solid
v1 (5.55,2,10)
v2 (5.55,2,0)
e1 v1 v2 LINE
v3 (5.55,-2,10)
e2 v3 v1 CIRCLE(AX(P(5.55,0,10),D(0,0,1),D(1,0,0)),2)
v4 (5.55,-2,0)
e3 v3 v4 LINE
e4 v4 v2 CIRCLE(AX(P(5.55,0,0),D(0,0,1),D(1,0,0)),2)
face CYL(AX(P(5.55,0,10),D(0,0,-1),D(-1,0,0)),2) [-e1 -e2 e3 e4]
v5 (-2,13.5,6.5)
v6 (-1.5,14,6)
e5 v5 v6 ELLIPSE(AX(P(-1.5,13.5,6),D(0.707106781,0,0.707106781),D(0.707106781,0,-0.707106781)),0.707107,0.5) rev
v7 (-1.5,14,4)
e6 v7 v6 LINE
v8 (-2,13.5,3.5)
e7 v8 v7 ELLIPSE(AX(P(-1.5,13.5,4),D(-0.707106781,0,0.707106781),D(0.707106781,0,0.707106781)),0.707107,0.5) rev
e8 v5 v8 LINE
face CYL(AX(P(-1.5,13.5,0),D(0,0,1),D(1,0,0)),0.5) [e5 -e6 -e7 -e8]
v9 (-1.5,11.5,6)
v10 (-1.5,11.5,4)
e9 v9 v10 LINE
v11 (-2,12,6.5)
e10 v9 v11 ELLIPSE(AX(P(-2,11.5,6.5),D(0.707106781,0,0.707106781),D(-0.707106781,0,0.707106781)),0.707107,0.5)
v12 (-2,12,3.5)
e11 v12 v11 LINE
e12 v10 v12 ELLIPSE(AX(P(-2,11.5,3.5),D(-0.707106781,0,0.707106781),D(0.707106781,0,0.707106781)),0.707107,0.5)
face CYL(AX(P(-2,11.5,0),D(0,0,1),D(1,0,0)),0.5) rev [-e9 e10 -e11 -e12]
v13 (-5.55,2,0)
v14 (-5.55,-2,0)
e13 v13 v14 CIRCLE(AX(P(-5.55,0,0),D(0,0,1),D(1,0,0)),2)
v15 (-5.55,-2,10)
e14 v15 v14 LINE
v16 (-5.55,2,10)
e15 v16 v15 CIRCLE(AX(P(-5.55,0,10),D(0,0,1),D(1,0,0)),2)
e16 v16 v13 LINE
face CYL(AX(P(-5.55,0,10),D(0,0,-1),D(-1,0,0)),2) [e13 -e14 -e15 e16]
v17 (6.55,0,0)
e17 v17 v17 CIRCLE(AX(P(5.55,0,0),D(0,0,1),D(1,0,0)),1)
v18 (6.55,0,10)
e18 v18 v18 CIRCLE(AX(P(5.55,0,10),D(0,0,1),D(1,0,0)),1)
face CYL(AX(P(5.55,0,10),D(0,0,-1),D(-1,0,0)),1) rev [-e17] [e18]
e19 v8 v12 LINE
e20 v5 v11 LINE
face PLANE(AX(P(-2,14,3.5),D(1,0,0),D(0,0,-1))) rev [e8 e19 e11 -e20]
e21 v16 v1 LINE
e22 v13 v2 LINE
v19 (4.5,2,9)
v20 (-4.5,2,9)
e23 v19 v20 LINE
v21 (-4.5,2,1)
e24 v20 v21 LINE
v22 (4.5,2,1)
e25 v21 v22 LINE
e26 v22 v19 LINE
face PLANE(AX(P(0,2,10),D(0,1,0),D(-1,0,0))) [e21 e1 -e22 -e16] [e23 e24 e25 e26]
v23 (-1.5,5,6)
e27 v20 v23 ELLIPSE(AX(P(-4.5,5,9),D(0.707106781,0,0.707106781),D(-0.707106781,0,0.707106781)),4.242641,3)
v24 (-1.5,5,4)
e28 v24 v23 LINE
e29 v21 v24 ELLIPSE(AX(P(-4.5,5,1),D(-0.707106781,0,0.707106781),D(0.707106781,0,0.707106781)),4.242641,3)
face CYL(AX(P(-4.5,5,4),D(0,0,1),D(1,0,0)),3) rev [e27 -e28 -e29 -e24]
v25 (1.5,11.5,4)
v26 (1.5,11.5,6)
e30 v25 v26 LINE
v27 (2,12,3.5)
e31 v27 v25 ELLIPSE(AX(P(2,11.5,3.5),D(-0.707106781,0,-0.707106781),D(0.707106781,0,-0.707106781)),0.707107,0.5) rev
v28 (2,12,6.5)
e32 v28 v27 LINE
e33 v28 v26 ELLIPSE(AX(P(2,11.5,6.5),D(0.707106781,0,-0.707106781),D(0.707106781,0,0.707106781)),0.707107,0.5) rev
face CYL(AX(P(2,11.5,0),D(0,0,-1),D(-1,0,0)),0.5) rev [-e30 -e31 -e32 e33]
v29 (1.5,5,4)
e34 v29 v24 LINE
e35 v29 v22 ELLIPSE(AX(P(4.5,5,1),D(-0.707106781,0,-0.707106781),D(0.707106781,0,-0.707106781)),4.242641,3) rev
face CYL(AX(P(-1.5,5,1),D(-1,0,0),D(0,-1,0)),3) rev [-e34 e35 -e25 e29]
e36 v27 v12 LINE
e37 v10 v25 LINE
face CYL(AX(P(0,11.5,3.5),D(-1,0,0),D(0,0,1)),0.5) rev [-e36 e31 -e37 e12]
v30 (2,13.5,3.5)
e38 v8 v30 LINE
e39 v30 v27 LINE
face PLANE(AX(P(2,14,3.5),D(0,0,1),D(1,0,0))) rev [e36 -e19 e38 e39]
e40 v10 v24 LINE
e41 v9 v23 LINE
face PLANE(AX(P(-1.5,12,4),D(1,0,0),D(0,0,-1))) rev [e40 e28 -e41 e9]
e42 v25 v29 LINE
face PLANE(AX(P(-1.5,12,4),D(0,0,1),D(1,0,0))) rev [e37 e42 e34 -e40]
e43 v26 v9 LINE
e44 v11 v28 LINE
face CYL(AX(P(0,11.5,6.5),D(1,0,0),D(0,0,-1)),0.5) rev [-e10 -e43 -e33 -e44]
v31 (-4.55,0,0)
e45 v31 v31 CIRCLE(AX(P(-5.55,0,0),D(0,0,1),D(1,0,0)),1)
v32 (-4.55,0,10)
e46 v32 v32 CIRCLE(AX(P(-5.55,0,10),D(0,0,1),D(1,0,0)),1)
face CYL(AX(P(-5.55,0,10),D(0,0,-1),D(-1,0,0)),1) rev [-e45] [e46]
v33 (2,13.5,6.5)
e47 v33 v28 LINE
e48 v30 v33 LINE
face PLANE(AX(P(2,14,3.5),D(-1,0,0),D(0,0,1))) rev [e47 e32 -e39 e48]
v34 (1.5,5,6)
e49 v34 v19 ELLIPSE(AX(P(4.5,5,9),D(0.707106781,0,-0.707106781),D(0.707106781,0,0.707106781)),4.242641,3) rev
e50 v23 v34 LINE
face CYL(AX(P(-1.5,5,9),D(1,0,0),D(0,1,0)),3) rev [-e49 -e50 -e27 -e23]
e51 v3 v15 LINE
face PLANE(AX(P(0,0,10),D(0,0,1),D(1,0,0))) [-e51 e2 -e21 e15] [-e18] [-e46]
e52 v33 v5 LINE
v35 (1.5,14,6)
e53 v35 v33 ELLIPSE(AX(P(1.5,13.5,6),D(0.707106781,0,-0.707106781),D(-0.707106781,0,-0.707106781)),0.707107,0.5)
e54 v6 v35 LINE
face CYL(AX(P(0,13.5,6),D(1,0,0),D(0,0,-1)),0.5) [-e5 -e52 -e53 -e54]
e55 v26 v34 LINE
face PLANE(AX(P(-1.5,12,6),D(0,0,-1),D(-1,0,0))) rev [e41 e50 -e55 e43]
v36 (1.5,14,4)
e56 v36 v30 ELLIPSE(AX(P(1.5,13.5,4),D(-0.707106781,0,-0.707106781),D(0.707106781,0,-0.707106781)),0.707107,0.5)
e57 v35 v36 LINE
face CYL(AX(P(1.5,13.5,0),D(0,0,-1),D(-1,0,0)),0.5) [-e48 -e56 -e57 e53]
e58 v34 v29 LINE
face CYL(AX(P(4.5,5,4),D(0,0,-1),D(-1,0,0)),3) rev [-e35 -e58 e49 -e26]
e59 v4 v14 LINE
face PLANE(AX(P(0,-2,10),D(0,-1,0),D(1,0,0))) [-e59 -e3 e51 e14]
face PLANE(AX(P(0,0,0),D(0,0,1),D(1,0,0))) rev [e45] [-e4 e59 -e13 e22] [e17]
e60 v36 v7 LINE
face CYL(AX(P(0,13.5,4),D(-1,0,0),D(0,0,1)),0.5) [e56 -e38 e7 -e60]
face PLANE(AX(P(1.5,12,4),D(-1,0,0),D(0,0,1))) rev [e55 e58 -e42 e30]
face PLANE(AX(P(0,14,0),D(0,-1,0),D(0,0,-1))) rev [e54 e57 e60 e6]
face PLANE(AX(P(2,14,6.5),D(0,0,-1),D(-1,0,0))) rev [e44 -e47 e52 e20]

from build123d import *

# Parameters (mm, degrees)
SKETCH1_R           = 1
BOSS_EXTRUDE1_DEPTH = 10
SKETCH2_W           = 3
SKETCH2_H           = 2
BOSS_EXTRUDE2_DEPTH = 10
FILLET1_R           = 3
SKETCH3_W           = 4
SKETCH3_H           = 3
BOSS_EXTRUDE3_DEPTH = 2
FILLET2_R           = 0.5


with BuildPart() as part:
    # Sketch1 → Boss-Extrude1 (new body)
    with BuildSketch(Plane.XY):
        with BuildLine():
            Line((5.55, -2), (-5.55, -2))
            ThreePointArc((-5.55, -2), (-7.55, 0), (-5.55, 2))
            Line((-5.55, 2), (5.55, 2))
            ThreePointArc((5.55, 2), (7.55, 0), (5.55, -2))
        make_face()
        with Locations((-5.55, 0)):
            Circle(SKETCH1_R, mode=Mode.SUBTRACT)
        with Locations((5.55, 0)):
            Circle(SKETCH1_R, mode=Mode.SUBTRACT)
    extrude(amount=BOSS_EXTRUDE1_DEPTH)

    # Sketch2 → Boss-Extrude2 (add)
    with BuildSketch(Plane(origin=(0, 2, 0), x_dir=(1, 0, 0), z_dir=(0, 1, 0))):
        with Locations((0, -5)):
            Rectangle(SKETCH2_W, SKETCH2_H)
    extrude(amount=BOSS_EXTRUDE2_DEPTH)

    # Fillet1
    fillet1_edges = [part.edges().sort_by_distance(p)[0] for p in [
        (1.5, 2, 5),
        (0, 2, 4),
        (-1.5, 2, 5),
        (0, 2, 6),
    ]]
    fillet(fillet1_edges, radius=FILLET1_R)

    # Sketch3 → Boss-Extrude3 (add)
    with BuildSketch(Plane(origin=(0, 12, 0), x_dir=(1, 0, 0), z_dir=(0, 1, 0))):
        with Locations((0, -5)):
            Rectangle(SKETCH3_W, SKETCH3_H)
    extrude(amount=BOSS_EXTRUDE3_DEPTH)

    # Fillet2
    fillet2_edges = [part.edges().sort_by_distance(p)[0] for p in [
        (1.5, 12, 5),
        (0, 12, 4),
        (-1.5, 12, 5),
        (0, 12, 6),
        (-2, 14, 5),
        (0, 14, 6.5),
        (2, 14, 5),
        (0, 14, 3.5),
    ]]
    fillet(fillet2_edges, radius=FILLET2_R - 0.0001)  # a hair under: the kernel refuses the full size


solid = part.part
